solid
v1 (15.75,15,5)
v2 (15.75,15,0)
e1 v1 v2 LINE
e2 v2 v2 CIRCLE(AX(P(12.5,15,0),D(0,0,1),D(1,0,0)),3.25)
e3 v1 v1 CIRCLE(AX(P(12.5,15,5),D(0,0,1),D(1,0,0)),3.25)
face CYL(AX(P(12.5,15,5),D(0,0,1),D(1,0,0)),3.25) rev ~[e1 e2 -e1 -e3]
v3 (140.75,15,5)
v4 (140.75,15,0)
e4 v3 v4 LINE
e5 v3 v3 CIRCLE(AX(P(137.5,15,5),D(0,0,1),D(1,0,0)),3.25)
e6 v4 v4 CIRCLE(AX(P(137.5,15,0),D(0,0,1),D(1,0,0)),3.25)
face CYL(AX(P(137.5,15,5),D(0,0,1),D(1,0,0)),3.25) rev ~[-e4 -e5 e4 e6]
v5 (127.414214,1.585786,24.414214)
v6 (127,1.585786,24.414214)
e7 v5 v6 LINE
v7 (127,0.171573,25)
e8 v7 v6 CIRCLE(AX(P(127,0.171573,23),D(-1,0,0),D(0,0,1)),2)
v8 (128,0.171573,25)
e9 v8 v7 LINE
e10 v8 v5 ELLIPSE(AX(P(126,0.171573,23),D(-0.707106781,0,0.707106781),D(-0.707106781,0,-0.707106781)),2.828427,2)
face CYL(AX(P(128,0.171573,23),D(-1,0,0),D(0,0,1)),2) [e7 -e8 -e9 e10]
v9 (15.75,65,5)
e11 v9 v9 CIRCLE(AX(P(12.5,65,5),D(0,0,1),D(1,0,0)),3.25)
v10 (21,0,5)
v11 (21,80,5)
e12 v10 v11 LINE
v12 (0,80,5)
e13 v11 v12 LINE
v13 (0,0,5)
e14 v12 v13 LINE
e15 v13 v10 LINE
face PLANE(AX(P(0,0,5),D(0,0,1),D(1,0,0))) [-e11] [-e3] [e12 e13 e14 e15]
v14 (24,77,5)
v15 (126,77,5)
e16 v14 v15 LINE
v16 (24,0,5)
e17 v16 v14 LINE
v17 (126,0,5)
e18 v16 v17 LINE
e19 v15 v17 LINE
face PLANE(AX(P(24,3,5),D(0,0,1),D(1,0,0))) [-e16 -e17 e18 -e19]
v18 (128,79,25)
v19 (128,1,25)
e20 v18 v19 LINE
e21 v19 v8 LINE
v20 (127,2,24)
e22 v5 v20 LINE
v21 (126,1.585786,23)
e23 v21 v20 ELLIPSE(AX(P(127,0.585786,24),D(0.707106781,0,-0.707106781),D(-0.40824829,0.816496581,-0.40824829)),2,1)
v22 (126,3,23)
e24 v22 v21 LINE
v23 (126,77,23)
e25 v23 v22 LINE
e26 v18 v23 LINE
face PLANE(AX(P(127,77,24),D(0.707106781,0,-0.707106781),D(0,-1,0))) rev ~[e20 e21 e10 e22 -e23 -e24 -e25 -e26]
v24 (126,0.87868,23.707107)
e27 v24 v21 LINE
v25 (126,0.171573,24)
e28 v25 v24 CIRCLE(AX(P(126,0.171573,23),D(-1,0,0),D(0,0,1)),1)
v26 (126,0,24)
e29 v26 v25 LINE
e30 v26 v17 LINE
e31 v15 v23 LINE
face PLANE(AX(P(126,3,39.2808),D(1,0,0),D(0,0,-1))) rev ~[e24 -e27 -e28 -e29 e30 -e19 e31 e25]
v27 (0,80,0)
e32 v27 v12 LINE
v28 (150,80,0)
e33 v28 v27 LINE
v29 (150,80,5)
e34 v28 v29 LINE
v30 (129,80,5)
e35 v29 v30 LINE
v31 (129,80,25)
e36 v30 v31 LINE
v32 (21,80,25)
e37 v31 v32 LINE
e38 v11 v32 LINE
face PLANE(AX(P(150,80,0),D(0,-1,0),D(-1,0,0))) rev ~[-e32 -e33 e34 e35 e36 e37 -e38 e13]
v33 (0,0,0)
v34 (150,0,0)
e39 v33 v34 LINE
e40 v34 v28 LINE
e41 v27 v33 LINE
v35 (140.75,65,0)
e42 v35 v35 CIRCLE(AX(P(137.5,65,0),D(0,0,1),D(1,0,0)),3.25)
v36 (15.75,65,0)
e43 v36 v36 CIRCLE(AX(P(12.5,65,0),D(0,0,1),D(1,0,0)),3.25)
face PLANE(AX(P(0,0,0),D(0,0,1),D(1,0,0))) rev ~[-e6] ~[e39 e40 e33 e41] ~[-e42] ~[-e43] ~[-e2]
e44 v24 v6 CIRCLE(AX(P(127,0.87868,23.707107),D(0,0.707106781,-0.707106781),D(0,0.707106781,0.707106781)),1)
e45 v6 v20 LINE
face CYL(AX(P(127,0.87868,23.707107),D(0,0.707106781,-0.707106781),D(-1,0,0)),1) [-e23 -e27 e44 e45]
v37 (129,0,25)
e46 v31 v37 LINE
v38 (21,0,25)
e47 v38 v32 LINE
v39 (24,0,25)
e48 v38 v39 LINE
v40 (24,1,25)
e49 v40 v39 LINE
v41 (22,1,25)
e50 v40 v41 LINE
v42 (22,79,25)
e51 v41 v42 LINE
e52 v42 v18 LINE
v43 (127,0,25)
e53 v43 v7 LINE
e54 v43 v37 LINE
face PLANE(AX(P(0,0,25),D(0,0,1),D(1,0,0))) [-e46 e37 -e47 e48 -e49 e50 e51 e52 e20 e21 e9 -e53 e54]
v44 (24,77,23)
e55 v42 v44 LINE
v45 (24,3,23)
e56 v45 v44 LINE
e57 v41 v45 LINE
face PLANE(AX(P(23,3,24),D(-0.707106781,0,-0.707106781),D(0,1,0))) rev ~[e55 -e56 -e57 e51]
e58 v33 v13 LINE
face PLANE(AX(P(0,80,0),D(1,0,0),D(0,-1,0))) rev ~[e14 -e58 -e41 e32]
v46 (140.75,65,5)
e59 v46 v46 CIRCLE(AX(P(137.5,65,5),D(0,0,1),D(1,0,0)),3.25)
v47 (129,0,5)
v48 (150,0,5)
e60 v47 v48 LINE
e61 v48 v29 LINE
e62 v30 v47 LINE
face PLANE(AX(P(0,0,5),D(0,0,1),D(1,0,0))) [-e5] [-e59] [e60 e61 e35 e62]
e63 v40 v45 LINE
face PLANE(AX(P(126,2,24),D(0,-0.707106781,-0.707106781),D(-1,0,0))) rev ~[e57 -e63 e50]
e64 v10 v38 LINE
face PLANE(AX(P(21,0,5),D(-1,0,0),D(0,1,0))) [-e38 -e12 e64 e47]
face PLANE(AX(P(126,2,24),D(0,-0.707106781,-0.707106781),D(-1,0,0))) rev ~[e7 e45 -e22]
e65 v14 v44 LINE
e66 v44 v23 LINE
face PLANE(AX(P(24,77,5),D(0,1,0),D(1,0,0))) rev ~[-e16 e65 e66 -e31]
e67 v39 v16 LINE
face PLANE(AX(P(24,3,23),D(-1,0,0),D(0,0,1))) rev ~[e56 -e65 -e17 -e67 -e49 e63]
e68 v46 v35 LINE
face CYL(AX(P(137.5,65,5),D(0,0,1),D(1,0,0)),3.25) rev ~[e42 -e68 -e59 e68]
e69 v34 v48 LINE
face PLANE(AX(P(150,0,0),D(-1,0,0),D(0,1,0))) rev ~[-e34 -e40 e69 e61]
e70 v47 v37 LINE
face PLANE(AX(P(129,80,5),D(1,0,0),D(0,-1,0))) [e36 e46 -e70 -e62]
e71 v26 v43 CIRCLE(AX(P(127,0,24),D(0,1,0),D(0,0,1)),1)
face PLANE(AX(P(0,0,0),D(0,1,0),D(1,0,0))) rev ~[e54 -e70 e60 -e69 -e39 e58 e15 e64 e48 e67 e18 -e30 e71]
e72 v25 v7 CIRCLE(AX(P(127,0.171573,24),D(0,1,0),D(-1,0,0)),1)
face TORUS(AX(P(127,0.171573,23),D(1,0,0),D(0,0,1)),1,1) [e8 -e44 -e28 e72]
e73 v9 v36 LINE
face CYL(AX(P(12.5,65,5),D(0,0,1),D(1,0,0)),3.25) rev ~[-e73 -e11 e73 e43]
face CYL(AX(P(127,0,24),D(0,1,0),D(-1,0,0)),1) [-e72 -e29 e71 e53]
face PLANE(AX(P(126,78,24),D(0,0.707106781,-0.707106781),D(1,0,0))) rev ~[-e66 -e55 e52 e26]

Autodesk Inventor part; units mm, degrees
ref_plane "YZ Plane" through (0, 0, 0) normal (1, 0, 0) x (0, 1, 0)
ref_plane "XZ Plane" through (0, 0, 0) normal (0, 1, 0) x (-1, 0, 0)
ref_plane "XY Plane" through (0, 0, 0) normal (0, 0, 1) x (1, 0, 0)
sketch "Sketch1" plane through (0, 0, 0) normal (0, 0, 1) x (1, 0, 0)
  line L0 (0, 0) -> (150, 0)
  line L1 (150, 0) -> (150, 80)
  line L2 (150, 80) -> (0, 80)
  line L3 (0, 80) -> (0, 0)
  dimension "d0" = 150
  dimension "d1" = 80
extrude "Extrusion1" add sketch "Sketch1" along normal blind 5
sketch "Sketch2" plane through (0, 0, 5) normal (0, 0, 1) x (1, 0, 0)
  line L0 (0, 0) -> (150, 0) projected
  line L1 (150, 80) -> (0, 80) projected
  line L2 (129, 0) -> (21, 0)
  line L3 (21, 0) -> (21, 80)
  line L4 (21, 80) -> (129, 80)
  line L5 (129, 80) -> (129, 0)
  line L6 (126, 3) -> (24, 3)
  line L7 (24, 3) -> (24, 77)
  line L8 (24, 77) -> (126, 77)
  line L9 (126, 77) -> (126, 3)
  line L10 (150, 0) -> (150, 80) projected
  point P0 (129, 80)
  point P1 (21, 0)
  dimension "d4" = 108
  dimension "d5" = 102
  dimension "d6" = 3
  dimension "d7" = 3
  dimension "d8" = 3
  dimension "d9" = 21
extrude "Extrusion2" add sketch "Sketch2" along normal blind 20 contours L3 L1 L5 L0
chamfer "Chamfer1" distance 2 angle 45 1 edges at (75, 3, 25)
chamfer "Chamfer2" distance 2 angle 45 1 edges at (126, 40, 25)
chamfer "Chamfer3" distance 2 angle 45 2 edges at (75, 77, 25) (24, 40, 25)
sketch "Sketch3" plane through (0, 0, 5) normal (0, 0, 1) x (1, 0, 0)
  circle A0 centre (137.5, 15) radius 3.25
  circle A1 centre (137.5, 65) radius 3.25
  line L0 (150, 0) -> (150, 80) projected
  line L1 (129, 0) -> (150, 0) projected
  line L2 (75, -16.6248) -> (75, 70.7208)
  line L3 (0, 80) -> (0, 0) projected
  circle A2 centre (12.5, 15) radius 3.25
  circle A3 centre (12.5, 65) radius 3.25
  dimension "d21" = 6.5
  dimension "d22" = 6.5
  dimension "d23" = 12.5
  dimension "d24" = 12.5
  dimension "d25" = 50
  dimension "d26" = 15
  dimension "d27" = 75
extrude "Extrusion3" cut sketch "Sketch3" against normal blind 60
sketch "Sketch4" plane through (24, 3, 5) normal (0, 1, 0) x (1, 0, 0)
  line L0 (0, 0) -> (0, -18) projected
  line L1 (102, -18) -> (102, 10.1304)
  line L2 (102, 10.1304) -> (0, 10.1304)
  line L3 (0, 10.1304) -> (0, -18)
  line L4 (0, 0) -> (102, 0) projected
  line L5 (102, 0) -> (0, 0)
  line L6 (0, 0) -> (0, -34.2808)
  line L7 (0, -34.2808) -> (102, -34.2808)
  line L8 (102, -34.2808) -> (102, 0)
  point P0 (-24, 5)
extrude "Extrusion5" cut sketch "Sketch4" against normal blind 10 contours L4 L1 L8 L7 L6 L0
fillet "Fillet1" radius 2 1 edges at (127, 1, 25)
fillet "Fillet2" radius 1 3 edges at (126, 0.9369, 24.8478) (126, 0.0858, 25) (126, 2.2929, 23.7071)
properties part number "MediumHolder"
